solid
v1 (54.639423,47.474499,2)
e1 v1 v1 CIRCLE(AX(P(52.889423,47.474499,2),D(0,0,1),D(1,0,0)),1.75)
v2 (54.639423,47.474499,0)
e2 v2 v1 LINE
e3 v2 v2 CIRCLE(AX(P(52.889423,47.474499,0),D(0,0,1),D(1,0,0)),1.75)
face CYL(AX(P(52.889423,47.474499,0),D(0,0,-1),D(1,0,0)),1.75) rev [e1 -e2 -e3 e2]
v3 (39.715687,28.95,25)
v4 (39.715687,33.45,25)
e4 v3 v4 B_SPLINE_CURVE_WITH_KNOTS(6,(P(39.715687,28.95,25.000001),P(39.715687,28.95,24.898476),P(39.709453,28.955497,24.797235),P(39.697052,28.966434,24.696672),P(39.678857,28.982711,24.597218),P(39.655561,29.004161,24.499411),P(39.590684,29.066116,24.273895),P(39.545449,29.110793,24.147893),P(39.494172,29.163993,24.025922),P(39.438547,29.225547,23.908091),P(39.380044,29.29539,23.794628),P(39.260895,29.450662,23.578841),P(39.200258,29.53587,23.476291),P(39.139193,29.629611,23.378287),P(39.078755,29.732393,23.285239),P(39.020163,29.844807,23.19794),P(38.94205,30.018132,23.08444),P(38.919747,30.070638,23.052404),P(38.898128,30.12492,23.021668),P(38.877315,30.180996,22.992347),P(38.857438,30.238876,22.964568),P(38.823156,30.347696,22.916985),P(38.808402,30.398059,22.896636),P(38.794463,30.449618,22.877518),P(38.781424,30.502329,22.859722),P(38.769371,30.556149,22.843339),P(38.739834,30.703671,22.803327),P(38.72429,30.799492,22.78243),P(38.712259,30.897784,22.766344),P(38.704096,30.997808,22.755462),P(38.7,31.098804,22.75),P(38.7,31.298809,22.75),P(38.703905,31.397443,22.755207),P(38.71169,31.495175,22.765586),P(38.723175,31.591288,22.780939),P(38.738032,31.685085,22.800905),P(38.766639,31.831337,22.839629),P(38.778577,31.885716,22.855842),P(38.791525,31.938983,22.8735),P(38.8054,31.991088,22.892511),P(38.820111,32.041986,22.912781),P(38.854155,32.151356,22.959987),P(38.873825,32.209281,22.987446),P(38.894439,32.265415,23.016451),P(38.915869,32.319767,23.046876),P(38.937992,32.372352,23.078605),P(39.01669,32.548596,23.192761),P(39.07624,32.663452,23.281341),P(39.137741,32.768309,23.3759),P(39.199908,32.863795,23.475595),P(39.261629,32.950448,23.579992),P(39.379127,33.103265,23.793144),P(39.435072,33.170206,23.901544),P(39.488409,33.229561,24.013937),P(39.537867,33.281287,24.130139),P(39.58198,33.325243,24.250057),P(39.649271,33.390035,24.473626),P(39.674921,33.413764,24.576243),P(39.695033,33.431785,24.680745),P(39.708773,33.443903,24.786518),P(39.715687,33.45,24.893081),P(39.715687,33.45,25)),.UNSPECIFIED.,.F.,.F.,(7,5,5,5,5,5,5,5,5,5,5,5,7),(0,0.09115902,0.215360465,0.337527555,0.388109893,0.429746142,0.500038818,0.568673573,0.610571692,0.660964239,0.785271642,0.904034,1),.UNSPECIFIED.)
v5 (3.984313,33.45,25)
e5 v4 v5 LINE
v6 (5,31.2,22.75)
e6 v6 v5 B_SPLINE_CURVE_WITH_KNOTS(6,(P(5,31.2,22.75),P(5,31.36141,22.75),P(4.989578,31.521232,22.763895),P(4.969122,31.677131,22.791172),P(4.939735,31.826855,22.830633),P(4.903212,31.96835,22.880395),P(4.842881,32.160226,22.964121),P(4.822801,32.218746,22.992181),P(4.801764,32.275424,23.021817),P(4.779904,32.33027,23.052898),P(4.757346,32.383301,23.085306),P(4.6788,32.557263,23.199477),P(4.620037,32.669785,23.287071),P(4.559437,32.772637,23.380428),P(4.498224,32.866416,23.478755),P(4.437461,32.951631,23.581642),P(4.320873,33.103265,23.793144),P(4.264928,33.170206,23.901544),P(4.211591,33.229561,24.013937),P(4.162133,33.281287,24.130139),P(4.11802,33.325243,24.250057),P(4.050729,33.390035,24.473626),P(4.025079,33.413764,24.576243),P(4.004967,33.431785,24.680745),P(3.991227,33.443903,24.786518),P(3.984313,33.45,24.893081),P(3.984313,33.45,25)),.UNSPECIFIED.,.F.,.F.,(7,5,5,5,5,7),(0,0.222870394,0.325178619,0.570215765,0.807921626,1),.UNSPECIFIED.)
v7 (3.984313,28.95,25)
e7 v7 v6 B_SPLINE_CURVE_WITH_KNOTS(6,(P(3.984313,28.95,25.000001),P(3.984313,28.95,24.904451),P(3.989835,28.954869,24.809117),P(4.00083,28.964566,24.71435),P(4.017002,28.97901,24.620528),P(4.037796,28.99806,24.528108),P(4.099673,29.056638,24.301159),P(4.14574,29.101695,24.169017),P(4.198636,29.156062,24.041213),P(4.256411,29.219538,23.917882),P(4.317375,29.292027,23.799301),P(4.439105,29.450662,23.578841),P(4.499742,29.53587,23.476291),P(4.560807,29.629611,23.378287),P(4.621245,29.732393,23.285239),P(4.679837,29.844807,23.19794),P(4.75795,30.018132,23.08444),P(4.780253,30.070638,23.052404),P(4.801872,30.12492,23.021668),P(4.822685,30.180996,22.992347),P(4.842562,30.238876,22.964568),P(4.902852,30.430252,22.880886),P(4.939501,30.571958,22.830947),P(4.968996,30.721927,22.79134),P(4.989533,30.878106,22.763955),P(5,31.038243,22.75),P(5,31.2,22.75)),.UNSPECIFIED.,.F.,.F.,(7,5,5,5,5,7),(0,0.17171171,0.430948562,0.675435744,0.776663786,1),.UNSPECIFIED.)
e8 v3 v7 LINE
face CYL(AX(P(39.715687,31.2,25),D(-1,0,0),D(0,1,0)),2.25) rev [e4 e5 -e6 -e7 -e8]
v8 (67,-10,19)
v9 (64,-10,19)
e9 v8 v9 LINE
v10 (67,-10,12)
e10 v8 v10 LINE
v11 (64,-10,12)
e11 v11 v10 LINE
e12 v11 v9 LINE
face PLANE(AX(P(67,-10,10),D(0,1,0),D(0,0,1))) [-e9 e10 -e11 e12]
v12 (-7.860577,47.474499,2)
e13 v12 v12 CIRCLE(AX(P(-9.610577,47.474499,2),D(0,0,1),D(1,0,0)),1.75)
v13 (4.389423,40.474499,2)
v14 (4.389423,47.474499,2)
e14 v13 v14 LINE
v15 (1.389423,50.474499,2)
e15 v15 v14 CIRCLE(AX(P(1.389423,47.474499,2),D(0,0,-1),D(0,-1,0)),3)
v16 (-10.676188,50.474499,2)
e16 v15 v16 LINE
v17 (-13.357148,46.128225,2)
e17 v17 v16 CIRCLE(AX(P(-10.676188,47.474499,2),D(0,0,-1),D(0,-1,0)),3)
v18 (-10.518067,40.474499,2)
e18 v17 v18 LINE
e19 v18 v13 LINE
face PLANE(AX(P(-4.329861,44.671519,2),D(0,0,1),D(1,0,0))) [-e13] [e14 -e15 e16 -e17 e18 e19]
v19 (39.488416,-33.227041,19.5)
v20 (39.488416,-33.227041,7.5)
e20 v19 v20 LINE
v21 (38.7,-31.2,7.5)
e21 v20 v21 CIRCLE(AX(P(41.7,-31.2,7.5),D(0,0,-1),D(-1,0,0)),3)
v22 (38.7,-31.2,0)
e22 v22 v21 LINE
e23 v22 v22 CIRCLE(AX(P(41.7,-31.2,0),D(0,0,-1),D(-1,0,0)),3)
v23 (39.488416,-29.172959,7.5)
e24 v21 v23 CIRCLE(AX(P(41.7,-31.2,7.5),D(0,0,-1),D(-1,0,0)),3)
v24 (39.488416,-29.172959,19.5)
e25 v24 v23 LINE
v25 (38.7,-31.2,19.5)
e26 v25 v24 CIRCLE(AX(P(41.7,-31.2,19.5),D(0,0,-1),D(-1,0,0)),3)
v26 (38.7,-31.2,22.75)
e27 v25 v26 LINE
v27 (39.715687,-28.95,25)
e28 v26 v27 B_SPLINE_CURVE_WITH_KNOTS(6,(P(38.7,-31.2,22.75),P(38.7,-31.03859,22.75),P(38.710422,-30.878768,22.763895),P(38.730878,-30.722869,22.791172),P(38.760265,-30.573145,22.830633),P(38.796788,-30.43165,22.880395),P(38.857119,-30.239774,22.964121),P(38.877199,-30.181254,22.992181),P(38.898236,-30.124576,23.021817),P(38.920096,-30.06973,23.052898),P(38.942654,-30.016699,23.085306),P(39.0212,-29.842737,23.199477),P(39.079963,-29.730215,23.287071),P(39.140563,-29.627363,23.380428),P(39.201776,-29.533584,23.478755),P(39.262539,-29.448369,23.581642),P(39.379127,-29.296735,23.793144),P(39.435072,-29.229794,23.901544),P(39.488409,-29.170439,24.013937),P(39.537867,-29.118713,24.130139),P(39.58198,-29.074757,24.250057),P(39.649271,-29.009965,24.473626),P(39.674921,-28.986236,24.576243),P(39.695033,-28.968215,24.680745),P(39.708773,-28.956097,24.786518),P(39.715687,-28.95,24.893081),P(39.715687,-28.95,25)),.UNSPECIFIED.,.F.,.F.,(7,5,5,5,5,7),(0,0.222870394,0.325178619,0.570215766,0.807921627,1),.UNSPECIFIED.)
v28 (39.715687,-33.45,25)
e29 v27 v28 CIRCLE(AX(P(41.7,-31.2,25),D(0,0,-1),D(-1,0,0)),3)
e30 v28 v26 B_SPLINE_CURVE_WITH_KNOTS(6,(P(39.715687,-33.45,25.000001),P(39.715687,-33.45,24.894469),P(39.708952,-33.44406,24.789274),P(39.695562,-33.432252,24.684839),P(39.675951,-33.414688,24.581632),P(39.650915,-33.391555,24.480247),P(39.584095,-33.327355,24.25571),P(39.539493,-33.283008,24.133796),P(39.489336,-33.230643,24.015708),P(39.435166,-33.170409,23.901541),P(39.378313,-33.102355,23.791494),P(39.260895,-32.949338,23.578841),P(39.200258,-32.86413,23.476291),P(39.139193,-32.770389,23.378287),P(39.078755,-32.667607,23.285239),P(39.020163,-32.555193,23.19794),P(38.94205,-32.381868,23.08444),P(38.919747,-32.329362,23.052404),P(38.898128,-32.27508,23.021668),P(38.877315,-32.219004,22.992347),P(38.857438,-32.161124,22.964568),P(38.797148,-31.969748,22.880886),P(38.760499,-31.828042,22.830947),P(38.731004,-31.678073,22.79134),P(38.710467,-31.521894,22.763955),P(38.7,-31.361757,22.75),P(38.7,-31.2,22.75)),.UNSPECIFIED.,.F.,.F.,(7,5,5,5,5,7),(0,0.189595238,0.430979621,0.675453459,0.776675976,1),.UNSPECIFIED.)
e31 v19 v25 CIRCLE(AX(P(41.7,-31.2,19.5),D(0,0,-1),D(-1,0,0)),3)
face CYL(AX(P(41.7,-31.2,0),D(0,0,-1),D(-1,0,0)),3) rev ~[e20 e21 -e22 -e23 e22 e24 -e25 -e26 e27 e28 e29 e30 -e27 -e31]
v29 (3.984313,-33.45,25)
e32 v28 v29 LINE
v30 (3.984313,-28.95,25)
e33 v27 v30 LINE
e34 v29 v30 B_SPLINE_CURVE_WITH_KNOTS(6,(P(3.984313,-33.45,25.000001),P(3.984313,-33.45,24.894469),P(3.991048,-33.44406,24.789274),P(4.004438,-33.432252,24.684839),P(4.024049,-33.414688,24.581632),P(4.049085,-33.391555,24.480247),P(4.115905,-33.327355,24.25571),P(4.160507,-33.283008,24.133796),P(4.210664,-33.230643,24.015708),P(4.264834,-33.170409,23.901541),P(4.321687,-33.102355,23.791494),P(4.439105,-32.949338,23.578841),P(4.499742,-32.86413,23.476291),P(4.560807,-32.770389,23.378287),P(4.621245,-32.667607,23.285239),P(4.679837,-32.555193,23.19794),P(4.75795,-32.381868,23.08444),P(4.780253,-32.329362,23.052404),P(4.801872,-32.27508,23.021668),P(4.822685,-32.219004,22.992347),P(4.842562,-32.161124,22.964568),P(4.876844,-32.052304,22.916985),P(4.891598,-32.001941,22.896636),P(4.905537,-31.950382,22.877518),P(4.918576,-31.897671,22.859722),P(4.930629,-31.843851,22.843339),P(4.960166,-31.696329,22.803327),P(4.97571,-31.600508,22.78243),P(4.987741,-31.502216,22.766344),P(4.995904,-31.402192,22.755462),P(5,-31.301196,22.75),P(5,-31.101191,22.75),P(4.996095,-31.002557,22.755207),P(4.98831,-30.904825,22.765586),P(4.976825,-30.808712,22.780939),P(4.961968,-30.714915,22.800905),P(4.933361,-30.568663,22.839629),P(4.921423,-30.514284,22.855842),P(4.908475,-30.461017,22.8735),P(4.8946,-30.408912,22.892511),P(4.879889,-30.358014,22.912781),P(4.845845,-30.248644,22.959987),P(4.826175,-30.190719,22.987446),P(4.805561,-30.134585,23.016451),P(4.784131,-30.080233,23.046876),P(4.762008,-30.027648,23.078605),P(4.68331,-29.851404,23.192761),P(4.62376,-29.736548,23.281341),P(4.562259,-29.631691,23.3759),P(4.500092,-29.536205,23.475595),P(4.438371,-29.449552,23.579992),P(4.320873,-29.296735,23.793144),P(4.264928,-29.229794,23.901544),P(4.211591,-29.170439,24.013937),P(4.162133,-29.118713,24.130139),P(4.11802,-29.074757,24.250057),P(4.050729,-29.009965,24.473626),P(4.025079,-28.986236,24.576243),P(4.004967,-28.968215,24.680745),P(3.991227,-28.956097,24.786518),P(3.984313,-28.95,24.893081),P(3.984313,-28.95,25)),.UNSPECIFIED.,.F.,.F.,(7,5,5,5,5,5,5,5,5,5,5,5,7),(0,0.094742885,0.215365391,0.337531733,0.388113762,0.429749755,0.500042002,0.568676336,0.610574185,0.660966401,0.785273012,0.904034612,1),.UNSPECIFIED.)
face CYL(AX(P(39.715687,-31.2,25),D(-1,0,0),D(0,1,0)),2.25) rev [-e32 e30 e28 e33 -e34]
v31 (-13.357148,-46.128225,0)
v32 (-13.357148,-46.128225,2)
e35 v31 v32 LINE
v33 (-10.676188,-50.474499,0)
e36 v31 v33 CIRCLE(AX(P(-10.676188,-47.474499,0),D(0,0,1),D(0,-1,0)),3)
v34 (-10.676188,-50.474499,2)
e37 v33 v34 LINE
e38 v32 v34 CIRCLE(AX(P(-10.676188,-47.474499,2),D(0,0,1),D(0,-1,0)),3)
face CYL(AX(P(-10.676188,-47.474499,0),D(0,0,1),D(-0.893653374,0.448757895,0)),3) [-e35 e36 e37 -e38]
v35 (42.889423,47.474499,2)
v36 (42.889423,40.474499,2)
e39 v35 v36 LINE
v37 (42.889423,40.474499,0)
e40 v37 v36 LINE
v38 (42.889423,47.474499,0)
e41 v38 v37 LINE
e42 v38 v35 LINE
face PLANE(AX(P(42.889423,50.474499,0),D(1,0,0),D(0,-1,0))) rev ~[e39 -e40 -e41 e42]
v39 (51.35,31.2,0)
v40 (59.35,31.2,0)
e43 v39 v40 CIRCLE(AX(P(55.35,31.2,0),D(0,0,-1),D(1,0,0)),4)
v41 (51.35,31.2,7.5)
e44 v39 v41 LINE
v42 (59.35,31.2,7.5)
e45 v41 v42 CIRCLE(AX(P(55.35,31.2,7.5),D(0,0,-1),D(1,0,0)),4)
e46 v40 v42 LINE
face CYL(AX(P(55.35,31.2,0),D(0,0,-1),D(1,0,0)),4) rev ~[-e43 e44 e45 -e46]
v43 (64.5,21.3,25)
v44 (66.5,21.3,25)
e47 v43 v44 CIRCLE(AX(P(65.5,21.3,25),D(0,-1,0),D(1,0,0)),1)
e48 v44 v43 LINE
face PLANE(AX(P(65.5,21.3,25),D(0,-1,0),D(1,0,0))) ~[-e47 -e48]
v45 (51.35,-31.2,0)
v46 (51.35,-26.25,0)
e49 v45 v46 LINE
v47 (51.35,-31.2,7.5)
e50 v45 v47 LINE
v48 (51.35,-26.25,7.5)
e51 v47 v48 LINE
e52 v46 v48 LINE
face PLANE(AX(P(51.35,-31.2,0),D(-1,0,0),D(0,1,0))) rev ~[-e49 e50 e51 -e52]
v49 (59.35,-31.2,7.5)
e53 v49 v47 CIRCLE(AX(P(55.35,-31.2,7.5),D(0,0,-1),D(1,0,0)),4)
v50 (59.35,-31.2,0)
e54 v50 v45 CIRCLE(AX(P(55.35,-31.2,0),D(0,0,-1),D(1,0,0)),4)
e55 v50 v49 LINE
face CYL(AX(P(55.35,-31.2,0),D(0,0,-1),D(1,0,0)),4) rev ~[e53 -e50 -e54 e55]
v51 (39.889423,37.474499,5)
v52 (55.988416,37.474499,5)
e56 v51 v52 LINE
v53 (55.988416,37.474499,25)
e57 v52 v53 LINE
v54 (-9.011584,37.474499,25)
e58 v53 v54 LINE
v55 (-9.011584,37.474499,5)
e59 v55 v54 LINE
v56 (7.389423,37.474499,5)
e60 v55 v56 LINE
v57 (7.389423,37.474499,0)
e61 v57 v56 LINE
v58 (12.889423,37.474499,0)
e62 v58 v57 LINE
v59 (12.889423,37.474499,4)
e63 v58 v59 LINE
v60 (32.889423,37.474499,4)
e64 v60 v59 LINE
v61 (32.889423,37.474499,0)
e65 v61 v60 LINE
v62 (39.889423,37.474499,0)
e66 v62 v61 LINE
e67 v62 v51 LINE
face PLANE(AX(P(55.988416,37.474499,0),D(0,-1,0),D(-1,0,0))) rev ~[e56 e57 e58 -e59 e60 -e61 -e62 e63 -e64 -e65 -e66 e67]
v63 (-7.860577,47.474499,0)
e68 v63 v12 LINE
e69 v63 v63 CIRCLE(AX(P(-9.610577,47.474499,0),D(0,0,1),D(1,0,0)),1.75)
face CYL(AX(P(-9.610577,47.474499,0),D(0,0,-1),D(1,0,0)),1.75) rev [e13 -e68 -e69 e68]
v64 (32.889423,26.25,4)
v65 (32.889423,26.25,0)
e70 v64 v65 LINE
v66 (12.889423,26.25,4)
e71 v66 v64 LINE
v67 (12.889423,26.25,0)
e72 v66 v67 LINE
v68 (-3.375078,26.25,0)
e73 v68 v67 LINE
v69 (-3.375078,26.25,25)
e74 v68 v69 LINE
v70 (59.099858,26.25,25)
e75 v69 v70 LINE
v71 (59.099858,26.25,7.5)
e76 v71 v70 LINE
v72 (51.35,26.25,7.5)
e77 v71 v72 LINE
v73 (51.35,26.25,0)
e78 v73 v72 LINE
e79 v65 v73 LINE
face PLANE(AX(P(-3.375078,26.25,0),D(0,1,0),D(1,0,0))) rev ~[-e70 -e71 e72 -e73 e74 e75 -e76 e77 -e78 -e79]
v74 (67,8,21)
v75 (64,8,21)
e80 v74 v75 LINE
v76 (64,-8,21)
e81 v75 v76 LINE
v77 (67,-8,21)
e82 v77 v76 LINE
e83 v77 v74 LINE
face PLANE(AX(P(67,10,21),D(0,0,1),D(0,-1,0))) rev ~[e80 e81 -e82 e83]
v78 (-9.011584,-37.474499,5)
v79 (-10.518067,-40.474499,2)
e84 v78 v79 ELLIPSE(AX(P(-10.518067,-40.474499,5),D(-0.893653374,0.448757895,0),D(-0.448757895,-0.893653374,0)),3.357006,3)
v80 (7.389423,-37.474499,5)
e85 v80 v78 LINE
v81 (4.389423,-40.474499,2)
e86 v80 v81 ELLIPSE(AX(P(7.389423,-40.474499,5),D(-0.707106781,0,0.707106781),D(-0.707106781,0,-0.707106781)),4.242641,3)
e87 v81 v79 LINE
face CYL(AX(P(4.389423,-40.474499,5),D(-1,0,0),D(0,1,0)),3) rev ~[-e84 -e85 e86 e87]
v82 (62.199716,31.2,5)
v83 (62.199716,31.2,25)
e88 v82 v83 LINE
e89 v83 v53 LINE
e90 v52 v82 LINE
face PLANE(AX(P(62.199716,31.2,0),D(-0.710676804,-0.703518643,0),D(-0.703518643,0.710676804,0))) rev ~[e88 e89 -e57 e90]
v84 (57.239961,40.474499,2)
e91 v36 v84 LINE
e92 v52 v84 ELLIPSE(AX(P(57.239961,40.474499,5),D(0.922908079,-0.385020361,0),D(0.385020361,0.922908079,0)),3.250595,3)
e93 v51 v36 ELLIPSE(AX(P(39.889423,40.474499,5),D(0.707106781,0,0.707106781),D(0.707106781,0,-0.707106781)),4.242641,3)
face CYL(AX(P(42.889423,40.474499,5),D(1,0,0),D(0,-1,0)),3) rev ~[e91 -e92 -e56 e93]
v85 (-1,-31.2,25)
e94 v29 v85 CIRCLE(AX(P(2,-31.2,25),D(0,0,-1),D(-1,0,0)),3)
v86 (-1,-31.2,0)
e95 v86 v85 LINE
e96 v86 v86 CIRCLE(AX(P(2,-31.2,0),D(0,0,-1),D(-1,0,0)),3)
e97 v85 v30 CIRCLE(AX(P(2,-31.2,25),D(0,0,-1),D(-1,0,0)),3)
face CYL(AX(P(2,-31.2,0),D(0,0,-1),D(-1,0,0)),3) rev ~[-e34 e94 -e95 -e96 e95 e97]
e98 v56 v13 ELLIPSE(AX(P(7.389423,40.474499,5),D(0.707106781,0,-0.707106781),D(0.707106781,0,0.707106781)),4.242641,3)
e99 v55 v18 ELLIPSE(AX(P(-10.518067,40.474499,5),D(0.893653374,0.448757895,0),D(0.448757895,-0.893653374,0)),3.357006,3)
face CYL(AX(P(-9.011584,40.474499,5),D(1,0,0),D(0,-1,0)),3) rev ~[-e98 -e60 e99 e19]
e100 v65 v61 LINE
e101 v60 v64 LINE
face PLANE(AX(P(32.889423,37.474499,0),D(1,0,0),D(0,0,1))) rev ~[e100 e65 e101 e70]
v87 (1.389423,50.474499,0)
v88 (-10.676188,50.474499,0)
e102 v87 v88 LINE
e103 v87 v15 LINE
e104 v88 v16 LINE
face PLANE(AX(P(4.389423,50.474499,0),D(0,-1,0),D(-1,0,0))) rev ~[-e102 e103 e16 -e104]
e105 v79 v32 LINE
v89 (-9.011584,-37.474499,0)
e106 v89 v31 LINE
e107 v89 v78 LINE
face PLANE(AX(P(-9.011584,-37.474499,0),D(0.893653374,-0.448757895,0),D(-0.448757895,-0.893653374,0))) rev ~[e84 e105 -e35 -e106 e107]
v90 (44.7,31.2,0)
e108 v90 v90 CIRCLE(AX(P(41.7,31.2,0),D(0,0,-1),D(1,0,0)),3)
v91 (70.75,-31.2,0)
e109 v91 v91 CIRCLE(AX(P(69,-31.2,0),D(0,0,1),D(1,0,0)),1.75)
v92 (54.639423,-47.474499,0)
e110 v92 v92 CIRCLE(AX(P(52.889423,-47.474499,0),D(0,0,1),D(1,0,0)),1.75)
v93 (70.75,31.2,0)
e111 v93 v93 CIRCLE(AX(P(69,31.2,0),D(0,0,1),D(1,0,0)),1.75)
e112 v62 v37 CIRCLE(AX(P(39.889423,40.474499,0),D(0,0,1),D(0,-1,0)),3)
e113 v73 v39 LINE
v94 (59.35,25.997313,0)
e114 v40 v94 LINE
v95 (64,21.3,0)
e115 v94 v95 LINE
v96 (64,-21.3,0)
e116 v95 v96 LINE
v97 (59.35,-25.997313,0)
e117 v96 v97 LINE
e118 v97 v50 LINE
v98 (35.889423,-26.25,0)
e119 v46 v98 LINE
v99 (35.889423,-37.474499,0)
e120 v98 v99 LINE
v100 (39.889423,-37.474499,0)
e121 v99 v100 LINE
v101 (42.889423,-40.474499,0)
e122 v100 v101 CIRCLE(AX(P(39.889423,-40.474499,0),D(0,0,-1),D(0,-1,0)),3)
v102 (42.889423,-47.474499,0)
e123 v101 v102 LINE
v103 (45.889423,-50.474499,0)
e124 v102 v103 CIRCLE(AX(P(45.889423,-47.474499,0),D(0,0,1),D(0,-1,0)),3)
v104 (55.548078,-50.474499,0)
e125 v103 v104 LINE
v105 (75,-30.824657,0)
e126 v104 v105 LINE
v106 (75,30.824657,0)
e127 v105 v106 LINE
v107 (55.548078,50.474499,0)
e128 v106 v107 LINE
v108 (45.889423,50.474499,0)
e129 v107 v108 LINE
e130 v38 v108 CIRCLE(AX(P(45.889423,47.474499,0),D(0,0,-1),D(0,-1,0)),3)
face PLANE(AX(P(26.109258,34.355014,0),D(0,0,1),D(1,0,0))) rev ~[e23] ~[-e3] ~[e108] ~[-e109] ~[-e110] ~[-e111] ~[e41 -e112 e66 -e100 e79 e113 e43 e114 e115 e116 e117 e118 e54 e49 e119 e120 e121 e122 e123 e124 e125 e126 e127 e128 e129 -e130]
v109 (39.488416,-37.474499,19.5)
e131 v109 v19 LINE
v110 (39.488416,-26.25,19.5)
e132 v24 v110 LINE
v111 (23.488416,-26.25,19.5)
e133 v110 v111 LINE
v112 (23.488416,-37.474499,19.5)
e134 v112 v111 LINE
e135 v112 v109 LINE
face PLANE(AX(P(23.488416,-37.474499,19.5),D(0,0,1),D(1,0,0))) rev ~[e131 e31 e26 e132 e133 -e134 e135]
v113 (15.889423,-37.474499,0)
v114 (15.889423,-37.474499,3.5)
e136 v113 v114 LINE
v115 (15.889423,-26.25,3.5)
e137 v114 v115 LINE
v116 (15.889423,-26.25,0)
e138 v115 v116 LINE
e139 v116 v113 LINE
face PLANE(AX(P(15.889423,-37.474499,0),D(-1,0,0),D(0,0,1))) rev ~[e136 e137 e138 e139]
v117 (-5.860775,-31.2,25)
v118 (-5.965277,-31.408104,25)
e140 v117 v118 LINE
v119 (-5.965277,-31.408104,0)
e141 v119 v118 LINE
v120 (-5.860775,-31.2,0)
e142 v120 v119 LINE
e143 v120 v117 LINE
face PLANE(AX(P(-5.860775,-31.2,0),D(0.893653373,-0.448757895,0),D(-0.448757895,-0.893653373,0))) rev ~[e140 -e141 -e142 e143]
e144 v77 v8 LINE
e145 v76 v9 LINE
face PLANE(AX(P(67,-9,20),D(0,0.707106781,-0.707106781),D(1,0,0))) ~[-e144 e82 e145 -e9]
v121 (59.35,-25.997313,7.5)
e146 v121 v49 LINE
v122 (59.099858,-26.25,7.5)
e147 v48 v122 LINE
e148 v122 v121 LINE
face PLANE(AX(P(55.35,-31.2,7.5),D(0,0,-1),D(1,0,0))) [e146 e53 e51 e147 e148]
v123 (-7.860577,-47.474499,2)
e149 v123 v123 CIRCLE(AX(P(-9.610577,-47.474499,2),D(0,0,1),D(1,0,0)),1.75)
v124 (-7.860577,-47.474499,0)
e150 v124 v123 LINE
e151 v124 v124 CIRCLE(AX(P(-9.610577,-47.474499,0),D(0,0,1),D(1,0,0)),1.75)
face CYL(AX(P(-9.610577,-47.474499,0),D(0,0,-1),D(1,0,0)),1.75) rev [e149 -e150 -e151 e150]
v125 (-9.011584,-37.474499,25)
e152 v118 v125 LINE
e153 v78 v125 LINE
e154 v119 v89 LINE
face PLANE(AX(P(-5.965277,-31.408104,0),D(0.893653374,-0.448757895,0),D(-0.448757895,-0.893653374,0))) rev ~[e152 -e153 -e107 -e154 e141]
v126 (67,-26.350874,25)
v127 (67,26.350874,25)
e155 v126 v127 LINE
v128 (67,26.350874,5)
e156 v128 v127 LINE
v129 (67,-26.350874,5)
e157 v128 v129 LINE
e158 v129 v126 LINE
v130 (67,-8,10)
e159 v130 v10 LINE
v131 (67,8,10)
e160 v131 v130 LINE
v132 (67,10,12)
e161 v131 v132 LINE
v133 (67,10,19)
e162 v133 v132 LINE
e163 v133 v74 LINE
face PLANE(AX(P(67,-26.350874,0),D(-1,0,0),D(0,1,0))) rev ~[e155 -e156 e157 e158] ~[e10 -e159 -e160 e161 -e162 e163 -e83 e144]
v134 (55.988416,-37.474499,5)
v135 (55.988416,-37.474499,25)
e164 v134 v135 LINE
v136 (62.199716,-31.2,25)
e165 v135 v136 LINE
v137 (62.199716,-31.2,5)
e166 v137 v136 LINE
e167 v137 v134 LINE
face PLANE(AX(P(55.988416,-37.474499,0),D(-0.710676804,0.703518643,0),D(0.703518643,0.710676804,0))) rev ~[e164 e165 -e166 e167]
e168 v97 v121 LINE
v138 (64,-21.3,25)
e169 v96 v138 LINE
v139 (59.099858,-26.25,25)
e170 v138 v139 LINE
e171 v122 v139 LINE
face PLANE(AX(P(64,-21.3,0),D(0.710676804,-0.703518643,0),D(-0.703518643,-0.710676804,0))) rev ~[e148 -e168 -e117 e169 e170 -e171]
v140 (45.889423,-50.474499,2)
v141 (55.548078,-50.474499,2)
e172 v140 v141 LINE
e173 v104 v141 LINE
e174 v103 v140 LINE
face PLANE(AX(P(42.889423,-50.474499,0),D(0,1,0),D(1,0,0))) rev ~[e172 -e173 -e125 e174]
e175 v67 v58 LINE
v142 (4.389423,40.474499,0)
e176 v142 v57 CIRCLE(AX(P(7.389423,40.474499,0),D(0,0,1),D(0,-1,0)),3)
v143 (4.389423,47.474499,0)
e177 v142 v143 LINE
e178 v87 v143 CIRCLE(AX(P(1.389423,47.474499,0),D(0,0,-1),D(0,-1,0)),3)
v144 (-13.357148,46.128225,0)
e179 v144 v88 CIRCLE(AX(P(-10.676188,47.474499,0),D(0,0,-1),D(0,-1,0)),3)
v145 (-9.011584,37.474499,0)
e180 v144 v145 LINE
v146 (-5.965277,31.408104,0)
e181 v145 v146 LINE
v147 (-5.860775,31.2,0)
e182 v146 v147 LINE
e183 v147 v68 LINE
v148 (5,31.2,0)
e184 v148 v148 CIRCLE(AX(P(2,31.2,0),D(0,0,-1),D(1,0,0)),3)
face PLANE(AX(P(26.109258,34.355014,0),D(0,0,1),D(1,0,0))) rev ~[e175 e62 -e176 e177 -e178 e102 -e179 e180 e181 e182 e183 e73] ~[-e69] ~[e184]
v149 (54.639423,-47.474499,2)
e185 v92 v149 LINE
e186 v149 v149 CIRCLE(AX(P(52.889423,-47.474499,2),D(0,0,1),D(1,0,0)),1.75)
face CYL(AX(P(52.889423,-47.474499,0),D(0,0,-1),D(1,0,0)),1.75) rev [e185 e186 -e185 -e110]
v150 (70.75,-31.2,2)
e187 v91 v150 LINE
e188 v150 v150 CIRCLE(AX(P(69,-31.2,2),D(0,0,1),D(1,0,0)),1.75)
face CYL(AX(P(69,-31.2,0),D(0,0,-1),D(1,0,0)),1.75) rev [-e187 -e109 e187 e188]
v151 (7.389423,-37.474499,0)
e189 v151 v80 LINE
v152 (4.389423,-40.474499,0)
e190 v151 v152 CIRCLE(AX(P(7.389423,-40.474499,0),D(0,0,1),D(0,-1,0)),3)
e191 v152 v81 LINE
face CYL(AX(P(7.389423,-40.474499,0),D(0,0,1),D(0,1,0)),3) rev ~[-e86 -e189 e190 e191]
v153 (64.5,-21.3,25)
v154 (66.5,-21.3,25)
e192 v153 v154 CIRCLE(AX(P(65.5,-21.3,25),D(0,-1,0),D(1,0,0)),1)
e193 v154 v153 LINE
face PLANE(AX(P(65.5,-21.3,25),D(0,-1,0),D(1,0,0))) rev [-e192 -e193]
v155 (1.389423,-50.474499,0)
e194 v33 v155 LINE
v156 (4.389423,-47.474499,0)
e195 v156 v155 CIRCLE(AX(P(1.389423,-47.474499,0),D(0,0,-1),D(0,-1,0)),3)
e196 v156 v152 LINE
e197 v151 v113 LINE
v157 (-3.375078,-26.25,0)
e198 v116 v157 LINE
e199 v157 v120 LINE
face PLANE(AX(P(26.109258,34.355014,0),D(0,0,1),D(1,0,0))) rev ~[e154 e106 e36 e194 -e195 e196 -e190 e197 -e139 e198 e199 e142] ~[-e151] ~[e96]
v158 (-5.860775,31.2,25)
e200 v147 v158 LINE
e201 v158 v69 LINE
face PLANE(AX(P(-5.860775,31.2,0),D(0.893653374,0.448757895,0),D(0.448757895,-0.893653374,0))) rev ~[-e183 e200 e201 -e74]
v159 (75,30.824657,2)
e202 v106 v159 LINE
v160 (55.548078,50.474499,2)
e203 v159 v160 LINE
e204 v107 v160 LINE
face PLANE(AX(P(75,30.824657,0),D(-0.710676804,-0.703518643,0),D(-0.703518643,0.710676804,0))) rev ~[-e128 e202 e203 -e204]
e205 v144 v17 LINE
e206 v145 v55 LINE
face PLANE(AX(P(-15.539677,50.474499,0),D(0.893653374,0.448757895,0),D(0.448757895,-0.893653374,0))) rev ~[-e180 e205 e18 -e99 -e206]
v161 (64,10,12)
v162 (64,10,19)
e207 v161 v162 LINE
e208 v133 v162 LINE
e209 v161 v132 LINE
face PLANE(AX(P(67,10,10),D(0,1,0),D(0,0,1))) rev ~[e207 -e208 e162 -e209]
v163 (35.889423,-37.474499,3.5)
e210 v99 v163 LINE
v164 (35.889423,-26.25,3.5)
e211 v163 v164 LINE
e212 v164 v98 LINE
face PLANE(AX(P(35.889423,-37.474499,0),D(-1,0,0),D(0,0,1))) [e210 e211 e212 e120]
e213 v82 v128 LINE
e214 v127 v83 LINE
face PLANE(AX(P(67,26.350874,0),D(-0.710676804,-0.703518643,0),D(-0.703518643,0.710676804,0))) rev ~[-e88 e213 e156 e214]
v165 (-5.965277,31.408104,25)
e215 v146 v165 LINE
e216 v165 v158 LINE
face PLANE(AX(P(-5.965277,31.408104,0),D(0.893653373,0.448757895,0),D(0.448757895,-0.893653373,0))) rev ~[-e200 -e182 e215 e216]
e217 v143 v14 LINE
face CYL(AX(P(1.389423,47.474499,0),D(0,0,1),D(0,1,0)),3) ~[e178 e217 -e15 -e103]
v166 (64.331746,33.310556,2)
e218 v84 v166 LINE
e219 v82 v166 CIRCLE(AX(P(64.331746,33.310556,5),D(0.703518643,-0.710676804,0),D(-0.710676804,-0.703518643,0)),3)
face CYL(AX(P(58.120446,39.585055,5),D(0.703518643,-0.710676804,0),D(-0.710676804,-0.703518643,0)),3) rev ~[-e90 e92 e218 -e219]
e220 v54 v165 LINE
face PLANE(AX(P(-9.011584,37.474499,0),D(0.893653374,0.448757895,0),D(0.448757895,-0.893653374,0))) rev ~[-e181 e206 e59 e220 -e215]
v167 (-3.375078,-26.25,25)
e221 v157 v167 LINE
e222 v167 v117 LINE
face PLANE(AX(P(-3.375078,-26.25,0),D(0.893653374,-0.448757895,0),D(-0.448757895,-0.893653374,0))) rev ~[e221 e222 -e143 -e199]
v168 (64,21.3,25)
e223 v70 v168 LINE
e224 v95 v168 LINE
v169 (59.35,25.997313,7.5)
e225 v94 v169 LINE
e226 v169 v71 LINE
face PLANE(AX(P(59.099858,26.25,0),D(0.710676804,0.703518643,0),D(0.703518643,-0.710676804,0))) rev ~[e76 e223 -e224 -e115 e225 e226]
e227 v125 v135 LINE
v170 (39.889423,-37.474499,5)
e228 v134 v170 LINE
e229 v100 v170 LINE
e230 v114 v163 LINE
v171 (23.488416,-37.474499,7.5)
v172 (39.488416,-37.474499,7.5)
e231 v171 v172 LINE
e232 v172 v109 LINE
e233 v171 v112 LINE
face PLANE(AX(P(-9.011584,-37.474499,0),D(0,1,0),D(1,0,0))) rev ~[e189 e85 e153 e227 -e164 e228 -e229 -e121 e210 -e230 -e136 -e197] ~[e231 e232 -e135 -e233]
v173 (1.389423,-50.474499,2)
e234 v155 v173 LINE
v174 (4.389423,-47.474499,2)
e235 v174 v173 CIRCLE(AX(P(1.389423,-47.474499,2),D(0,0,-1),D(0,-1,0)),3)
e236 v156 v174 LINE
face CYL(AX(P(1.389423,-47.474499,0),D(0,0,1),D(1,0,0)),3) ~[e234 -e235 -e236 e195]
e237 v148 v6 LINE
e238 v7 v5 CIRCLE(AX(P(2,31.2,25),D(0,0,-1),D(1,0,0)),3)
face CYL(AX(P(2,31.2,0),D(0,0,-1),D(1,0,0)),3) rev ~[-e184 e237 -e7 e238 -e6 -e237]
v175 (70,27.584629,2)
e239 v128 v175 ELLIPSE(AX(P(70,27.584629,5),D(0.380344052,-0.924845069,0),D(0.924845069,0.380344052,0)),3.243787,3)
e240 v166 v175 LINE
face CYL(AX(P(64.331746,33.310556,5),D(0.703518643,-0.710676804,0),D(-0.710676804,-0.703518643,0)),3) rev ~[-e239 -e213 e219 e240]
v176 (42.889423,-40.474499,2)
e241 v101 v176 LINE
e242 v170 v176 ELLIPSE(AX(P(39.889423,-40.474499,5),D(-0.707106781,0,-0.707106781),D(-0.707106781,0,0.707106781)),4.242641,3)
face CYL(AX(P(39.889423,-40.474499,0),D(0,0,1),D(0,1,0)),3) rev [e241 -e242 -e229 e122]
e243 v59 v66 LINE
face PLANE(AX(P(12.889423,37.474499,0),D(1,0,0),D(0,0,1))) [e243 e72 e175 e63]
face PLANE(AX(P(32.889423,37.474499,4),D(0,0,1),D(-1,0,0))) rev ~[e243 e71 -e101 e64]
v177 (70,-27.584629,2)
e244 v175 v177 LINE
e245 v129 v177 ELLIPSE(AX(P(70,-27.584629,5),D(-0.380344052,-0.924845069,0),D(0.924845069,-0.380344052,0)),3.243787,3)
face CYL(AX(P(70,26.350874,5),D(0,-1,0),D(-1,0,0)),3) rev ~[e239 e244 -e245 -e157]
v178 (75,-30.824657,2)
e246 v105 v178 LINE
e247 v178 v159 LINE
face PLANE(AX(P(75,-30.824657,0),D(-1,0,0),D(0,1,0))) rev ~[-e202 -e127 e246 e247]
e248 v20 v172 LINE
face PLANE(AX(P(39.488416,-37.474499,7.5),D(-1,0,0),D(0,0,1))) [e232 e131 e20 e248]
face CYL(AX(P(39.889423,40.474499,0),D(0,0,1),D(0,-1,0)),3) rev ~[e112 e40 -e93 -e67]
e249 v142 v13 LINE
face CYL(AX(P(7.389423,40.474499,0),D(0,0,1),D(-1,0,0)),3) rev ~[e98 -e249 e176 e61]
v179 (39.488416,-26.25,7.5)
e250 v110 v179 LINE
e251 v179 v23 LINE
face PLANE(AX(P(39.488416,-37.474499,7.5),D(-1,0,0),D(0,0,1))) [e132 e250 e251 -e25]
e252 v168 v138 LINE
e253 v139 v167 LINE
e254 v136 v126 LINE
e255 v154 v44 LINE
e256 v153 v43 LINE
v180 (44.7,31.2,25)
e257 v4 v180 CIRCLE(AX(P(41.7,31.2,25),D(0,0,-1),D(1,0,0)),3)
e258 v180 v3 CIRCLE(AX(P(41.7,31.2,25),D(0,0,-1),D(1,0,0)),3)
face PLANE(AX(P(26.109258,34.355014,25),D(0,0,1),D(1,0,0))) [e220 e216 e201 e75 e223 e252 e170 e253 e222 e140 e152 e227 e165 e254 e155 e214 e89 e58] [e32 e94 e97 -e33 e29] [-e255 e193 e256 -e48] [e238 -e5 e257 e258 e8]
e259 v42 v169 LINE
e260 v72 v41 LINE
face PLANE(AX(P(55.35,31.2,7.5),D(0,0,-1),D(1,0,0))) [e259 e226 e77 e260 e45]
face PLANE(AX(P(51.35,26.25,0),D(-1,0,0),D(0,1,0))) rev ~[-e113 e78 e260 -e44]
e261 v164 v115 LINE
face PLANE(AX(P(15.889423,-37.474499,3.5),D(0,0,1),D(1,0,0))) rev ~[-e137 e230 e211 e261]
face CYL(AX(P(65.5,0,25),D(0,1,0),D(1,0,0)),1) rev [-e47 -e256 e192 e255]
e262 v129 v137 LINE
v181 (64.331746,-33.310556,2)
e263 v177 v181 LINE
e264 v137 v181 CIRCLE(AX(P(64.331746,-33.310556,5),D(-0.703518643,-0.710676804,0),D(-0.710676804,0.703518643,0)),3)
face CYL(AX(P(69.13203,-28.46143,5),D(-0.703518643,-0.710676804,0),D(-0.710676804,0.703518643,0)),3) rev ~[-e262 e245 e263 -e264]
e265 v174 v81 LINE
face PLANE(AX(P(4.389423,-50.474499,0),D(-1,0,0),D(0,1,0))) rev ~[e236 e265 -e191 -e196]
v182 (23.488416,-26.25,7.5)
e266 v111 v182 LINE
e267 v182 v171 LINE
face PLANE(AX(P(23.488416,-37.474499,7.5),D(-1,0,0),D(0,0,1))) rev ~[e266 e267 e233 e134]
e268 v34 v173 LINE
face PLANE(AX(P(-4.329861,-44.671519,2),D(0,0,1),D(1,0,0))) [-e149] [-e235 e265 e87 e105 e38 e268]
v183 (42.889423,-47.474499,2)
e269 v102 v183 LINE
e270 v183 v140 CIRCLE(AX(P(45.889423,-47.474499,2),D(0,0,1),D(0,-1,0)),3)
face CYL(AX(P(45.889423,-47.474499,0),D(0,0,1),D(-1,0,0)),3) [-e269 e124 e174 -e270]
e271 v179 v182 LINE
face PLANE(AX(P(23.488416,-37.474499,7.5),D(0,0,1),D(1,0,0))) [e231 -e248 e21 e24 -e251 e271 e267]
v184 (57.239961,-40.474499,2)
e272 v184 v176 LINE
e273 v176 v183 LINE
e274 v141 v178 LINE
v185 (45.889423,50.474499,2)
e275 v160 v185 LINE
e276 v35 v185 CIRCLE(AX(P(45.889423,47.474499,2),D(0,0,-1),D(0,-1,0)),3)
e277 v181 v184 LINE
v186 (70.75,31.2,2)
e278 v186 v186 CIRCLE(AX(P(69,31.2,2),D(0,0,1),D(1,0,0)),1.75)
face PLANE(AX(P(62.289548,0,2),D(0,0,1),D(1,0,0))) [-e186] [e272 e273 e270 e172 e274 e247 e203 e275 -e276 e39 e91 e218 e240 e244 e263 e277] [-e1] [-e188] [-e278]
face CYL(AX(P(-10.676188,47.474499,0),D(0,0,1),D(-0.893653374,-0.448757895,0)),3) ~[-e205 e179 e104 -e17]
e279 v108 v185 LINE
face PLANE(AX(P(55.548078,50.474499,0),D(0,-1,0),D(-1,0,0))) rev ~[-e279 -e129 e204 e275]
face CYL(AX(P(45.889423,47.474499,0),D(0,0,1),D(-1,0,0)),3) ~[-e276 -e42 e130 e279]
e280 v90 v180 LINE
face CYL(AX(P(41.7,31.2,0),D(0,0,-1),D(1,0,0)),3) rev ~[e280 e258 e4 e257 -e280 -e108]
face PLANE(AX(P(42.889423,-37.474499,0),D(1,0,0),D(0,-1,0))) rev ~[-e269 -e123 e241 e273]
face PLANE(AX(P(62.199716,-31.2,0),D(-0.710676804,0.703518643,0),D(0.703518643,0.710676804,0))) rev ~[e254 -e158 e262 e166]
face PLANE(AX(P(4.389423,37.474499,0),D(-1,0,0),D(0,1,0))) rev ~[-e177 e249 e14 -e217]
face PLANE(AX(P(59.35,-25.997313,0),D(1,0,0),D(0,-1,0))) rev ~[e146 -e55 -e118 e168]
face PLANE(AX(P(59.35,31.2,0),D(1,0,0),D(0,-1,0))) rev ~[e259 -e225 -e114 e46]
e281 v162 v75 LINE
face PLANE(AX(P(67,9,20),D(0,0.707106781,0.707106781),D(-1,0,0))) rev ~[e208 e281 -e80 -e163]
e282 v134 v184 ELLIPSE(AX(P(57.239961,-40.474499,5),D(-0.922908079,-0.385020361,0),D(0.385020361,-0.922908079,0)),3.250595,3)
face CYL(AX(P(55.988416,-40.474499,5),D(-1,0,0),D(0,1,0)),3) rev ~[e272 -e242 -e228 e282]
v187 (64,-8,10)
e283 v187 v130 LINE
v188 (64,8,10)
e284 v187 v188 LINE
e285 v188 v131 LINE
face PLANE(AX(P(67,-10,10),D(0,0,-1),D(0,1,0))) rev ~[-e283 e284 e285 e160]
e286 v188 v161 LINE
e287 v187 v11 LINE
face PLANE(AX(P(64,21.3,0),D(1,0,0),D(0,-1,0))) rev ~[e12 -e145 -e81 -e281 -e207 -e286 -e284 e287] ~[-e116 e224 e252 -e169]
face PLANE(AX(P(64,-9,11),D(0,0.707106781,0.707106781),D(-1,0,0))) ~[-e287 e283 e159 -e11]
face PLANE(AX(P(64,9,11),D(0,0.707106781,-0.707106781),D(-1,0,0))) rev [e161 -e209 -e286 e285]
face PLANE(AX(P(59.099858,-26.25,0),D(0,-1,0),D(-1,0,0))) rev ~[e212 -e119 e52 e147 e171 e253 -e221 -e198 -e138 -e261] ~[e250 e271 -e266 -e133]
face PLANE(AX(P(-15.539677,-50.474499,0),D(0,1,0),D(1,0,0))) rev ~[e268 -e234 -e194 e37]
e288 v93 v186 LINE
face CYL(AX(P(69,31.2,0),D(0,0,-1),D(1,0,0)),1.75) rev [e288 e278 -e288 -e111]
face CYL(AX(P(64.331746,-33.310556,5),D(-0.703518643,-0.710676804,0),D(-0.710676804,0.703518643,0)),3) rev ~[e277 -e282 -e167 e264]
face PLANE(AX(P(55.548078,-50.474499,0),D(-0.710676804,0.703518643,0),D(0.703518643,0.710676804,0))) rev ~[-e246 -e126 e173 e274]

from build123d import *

# Parameters (mm, degrees)
F0_R      = 1.75
F1_DEPTH  = 2
F2_DEPTH  = 25
F3_W      = 10
F3_H      = 11
F4_DEPTH  = 12.5
F5_W      = 16
F5_H      = 12
F5_W_2    = 9.587623179
F5_H_2    = 49.3407100439
F5_W_3    = 20
F5_H_3    = 3.5
F6_W      = 20
F6_H      = 4
F7_DEPTH  = 12.5
F8_R      = 3
F10_DEPTH = 7.5
F11_W     = 1
F11_H     = 42.6
F15_SIZE  = 2


# Not quite as in the source:
# - a feature names something its author has since deleted; it is built from what else it names


with BuildPart() as f1:
    # F0 (on Top) → F1 (new body)
    with BuildSketch(Plane.XY):
        Polygon((-15.5396774872, 50.4744988004), (-9.0115841546, 37.4744988004), (4.3894230769, 37.4744988004), (4.3894230769, 50.4744988004), align=None)
        with Locations((-9.6105769231, 47.4744988004)):
            Circle(F0_R, mode=Mode.SUBTRACT)
    extrude(amount=F1_DEPTH)



with BuildPart() as f1b:
    # F0 (on Top) → F1, piece 2 (new body)
    with BuildSketch(Plane.XY):
        Polygon((55.9884158454, 37.4744988004), (62.1997159179, 31.2), (67, 26.3508739936), (67, -26.3508739936), (62.1997159179, -31.2), (55.9884158454, -37.4744988004), (42.8894230769, -37.4744988004), (42.8894230769, -50.4744988004), (55.5480775622, -50.4744988004), (75, -30.8246569672), (75, 30.8246569672), (55.5480775622, 50.4744988004), (42.8894230769, 50.4744988004), (42.8894230769, 37.4744988004), align=None)
        with Locations((52.8894230769, -47.4744988004)):
            Circle(F0_R, mode=Mode.SUBTRACT)
        with Locations((69, -31.2)):
            Circle(F0_R, mode=Mode.SUBTRACT)
        with Locations((69, 31.2)):
            Circle(F0_R, mode=Mode.SUBTRACT)
        with Locations((52.8894230769, 47.4744988004)):
            Circle(F0_R, mode=Mode.SUBTRACT)
    extrude(amount=F1_DEPTH)


with BuildPart() as f1c:
    # F0 (on Top) → F1, piece 3 (new body)
    with BuildSketch(Plane.XY):
        Polygon((4.3894230769, -50.4744988004), (4.3894230769, -37.4744988004), (-9.0115841546, -37.4744988004), (-15.5396774872, -50.4744988004), align=None)
        with Locations((-9.6105769231, -47.4744988004)):
            Circle(F0_R, mode=Mode.SUBTRACT)
    extrude(amount=F1_DEPTH)


with BuildPart() as f1_1:
    add(f1.part)

    add(f1b.part)  # F2 merges F1b

    add(f1c.part)  # F2 merges F1c
    # F0 (on Top) → F2 (join)
    with BuildSketch(Plane.XY):
        with BuildLine():
            ThreePointArc((-1, 31.2), (2, 34.2), (5, 31.2))
            Line((5, 31.2), (38.7, 31.2))
            ThreePointArc((38.7, 31.2), (41.7, 34.2), (44.7, 31.2))
            Line((44.7, 31.2), (54.1997159179, 31.2))
            Line((54.1997159179, 31.2), (62.1997159179, 31.2))
            Line((62.1997159179, 31.2), (55.9884158454, 37.4744988004))
            Line((55.9884158454, 37.4744988004), (42.8894230769, 37.4744988004))
            Line((42.8894230769, 37.4744988004), (4.3894230769, 37.4744988004))
            Line((4.3894230769, 37.4744988004), (-9.0115841546, 37.4744988004))
            Line((-9.0115841546, 37.4744988004), (-5.9652768733, 31.4081035087))
            Line((-5.9652768733, 31.4081035087), (-5.8607754019, 31.2))
            Line((-5.8607754019, 31.2), (-1, 31.2))
        make_face()
        with BuildLine():
            Line((55.9884158454, -37.4744988004), (62.1997159179, -31.2))
            Line((62.1997159179, -31.2), (54.1997159179, -31.2))
            Line((54.1997159179, -31.2), (44.7, -31.2))
            ThreePointArc((44.7, -31.2), (41.7, -34.2), (38.7, -31.2))
            Line((38.7, -31.2), (5, -31.2))
            ThreePointArc((5, -31.2), (2, -34.2), (-1, -31.2))
            Line((-1, -31.2), (-5.8607754019, -31.2))
            Line((-5.8607754019, -31.2), (-5.9652768733, -31.4081035087))
            Line((-5.9652768733, -31.4081035087), (-9.0115841546, -37.4744988004))
            Line((-9.0115841546, -37.4744988004), (4.3894230769, -37.4744988004))
            Line((4.3894230769, -37.4744988004), (42.8894230769, -37.4744988004))
            Line((42.8894230769, -37.4744988004), (55.9884158454, -37.4744988004))
        make_face()
        Polygon((62.1997159179, 31.2), (54.1997159179, 31.2), (59.0998579589, 26.25), (64, 21.3), (64, -21.3), (59.0998579589, -26.25), (54.1997159179, -31.2), (62.1997159179, -31.2), (67, -26.3508739936), (67, 26.3508739936), align=None)
        with BuildLine():
            Line((38.7, 31.2), (5, 31.2))
            ThreePointArc((5, 31.2), (2, 28.2), (-1, 31.2))
            Line((-1, 31.2), (-5.8607754019, 31.2))
            Line((-5.8607754019, 31.2), (-3.3750783253, 26.25))
            Line((-3.3750783253, 26.25), (59.0998579589, 26.25))
            Line((59.0998579589, 26.25), (54.1997159179, 31.2))
            Line((54.1997159179, 31.2), (44.7, 31.2))
            ThreePointArc((44.7, 31.2), (41.7, 28.2), (38.7, 31.2))
        make_face()
        with BuildLine():
            Line((54.1997159179, -31.2), (59.0998579589, -26.25))
            Line((59.0998579589, -26.25), (-3.3750783253, -26.25))
            Line((-3.3750783253, -26.25), (-5.8607754019, -31.2))
            Line((-5.8607754019, -31.2), (-1, -31.2))
            ThreePointArc((-1, -31.2), (2, -28.2), (5, -31.2))
            Line((5, -31.2), (38.7, -31.2))
            ThreePointArc((38.7, -31.2), (41.7, -28.2), (44.7, -31.2))
            Line((44.7, -31.2), (54.1997159179, -31.2))
        make_face()
    extrude(amount=F2_DEPTH)

    # F3 (on face) → F4 (cut, symmetric)
    with BuildSketch(Plane.YZ.offset(67)):
        with Locations((-5, 15.5)):
            Rectangle(F3_W, F3_H)
        with Locations((5, 15.5)):
            Rectangle(F3_W, F3_H)
    extrude(amount=F4_DEPTH, both=True, mode=Mode.SUBTRACT)

    # F5 (on face) + F6 (on face) → F7 (cut, symmetric)
    with BuildSketch(Plane.XZ.offset(37.4744988004)):
        with Locations((31.4884158454, 13.5)):
            Rectangle(F5_W, F5_H)
        with Locations((88.4978957474, 268.2395651937)):
            Rectangle(F5_W_2, F5_H_2)
        with Locations((25.8894230769, 1.75)):
            Rectangle(F5_W_3, F5_H_3)
    with BuildSketch(Plane(origin=(0, 37.4744988004, 0), x_dir=(-1, 0, 0), z_dir=(0, 1, 0))):
        with Locations((-22.8894230769, 2)):
            Rectangle(F6_W, F6_H)
    extrude(amount=F7_DEPTH, both=True, dir=(0, -1, 0), mode=Mode.SUBTRACT)

    # F8
    f8_edges = [f1_1.edges().sort_by_distance(p)[0] for p in [
        (49.438919, 37.474499, 2),
        (-2.311081, 37.474499, 2),
        (61.494208, 31.912686, 2),
        (67, 0, 2),
        (61.494208, -31.912686, 2),
        (49.438919, -37.474499, 2),
        (-2.311081, -37.474499, 2),
        (4.389423, 37.474499, 1),
        (42.889423, 37.474499, 1),
        (4.389423, -37.474499, 1),
        (42.889423, -37.474499, 1),
        (-15.539677, 50.474499, 1),
        (-15.539677, -50.474499, 1),
        (42.889423, 50.474499, 1),
        (4.389423, 50.474499, 1),
        (42.889423, -50.474499, 1),
        (4.389423, -50.474499, 1),
    ]]
    fillet(f8_edges, radius=F8_R)

    # F9 (on face) → F10 (cut)
    with BuildSketch(Plane(origin=(0, 0, 0), x_dir=(1, 0, 0), z_dir=(0, 0, -1))):
        with BuildLine():
            ThreePointArc((51.35, 31.2), (55.35, 27.2), (59.35, 31.2))
            ThreePointArc((59.35, 31.2), (55.35, 35.2), (51.35, 31.2))
        make_face()
        with BuildLine():
            Line((59.35, 26.25), (59.35, 31.2))
            ThreePointArc((59.35, 31.2), (55.35, 27.2), (51.35, 31.2))
            Line((51.35, 31.2), (51.35, 26.25))
            Line((51.35, 26.25), (59.0998579589, 26.25))
            Line((59.0998579589, 26.25), (59.35, 26.25))
        make_face()
        Polygon((59.35, 25.997312814), (59.35, 26.25), (59.0998579589, 26.25), align=None)
        with BuildLine():
            ThreePointArc((51.35, -31.2), (55.35, -35.2), (59.35, -31.2))
            ThreePointArc((59.35, -31.2), (55.35, -27.2), (51.35, -31.2))
        make_face()
        with BuildLine():
            ThreePointArc((51.35, -31.2), (55.35, -27.2), (59.35, -31.2))
            Line((59.35, -31.2), (59.35, -26.25))
            Line((59.35, -26.25), (59.0998579589, -26.25))
            Line((59.0998579589, -26.25), (51.35, -26.25))
            Line((51.35, -26.25), (51.35, -31.2))
        make_face()
        Polygon((59.0998579589, -26.25), (59.35, -26.25), (59.35, -25.997312814), align=None)
    extrude(amount=-F10_DEPTH, mode=Mode.SUBTRACT)

    # F11 (on face) → F12 (revolve, cut)
    with BuildSketch(Plane.XY.offset(25)):
        with Locations((66, 0)):
            Rectangle(F11_W, F11_H)
    revolve(axis=Axis((65.5, 0, 25), (0, -1, 0)), mode=Mode.SUBTRACT)

    # F11 (on face) → F13 (revolve, cut)
    with BuildSketch(Plane.XY.offset(25)):
        with BuildLine():
            ThreePointArc((3.9843134833, 33.45), (4.7343134833, 32.4343134833), (5, 31.2))
            Line((5, 31.2), (38.7, 31.2))
            ThreePointArc((38.7, 31.2), (38.9656865167, 32.4343134833), (39.7156865167, 33.45))
            Line((39.7156865167, 33.45), (3.9843134833, 33.45))
        make_face()
    revolve(axis=Axis((21.85, 31.2, 25), (1, 0, 0)), mode=Mode.SUBTRACT)

    # F11 (on face) → F14 (revolve, cut)
    with BuildSketch(Plane.XY.offset(25)):
        with BuildLine():
            Line((5, -31.2), (38.7, -31.2))
            ThreePointArc((38.7, -31.2), (38.9656865167, -29.9656865167), (39.7156865167, -28.95))
            Line((39.7156865167, -28.95), (3.9843134833, -28.95))
            ThreePointArc((3.9843134833, -28.95), (4.7343134833, -29.9656865167), (5, -31.2))
        make_face()
    revolve(axis=Axis((21.85, -31.2, 25), (1, 0, 0)), mode=Mode.SUBTRACT)

    # F15
    f15_edges = [f1_1.edges().sort_by_distance(p)[0] for p in [
        (65.5, -10, 21),
        (65.5, 10, 21),
        (65.5, -10, 10),
        (65.5, 10, 10),
    ]]
    chamfer(f15_edges, length=F15_SIZE)


solid = f1_1.part
